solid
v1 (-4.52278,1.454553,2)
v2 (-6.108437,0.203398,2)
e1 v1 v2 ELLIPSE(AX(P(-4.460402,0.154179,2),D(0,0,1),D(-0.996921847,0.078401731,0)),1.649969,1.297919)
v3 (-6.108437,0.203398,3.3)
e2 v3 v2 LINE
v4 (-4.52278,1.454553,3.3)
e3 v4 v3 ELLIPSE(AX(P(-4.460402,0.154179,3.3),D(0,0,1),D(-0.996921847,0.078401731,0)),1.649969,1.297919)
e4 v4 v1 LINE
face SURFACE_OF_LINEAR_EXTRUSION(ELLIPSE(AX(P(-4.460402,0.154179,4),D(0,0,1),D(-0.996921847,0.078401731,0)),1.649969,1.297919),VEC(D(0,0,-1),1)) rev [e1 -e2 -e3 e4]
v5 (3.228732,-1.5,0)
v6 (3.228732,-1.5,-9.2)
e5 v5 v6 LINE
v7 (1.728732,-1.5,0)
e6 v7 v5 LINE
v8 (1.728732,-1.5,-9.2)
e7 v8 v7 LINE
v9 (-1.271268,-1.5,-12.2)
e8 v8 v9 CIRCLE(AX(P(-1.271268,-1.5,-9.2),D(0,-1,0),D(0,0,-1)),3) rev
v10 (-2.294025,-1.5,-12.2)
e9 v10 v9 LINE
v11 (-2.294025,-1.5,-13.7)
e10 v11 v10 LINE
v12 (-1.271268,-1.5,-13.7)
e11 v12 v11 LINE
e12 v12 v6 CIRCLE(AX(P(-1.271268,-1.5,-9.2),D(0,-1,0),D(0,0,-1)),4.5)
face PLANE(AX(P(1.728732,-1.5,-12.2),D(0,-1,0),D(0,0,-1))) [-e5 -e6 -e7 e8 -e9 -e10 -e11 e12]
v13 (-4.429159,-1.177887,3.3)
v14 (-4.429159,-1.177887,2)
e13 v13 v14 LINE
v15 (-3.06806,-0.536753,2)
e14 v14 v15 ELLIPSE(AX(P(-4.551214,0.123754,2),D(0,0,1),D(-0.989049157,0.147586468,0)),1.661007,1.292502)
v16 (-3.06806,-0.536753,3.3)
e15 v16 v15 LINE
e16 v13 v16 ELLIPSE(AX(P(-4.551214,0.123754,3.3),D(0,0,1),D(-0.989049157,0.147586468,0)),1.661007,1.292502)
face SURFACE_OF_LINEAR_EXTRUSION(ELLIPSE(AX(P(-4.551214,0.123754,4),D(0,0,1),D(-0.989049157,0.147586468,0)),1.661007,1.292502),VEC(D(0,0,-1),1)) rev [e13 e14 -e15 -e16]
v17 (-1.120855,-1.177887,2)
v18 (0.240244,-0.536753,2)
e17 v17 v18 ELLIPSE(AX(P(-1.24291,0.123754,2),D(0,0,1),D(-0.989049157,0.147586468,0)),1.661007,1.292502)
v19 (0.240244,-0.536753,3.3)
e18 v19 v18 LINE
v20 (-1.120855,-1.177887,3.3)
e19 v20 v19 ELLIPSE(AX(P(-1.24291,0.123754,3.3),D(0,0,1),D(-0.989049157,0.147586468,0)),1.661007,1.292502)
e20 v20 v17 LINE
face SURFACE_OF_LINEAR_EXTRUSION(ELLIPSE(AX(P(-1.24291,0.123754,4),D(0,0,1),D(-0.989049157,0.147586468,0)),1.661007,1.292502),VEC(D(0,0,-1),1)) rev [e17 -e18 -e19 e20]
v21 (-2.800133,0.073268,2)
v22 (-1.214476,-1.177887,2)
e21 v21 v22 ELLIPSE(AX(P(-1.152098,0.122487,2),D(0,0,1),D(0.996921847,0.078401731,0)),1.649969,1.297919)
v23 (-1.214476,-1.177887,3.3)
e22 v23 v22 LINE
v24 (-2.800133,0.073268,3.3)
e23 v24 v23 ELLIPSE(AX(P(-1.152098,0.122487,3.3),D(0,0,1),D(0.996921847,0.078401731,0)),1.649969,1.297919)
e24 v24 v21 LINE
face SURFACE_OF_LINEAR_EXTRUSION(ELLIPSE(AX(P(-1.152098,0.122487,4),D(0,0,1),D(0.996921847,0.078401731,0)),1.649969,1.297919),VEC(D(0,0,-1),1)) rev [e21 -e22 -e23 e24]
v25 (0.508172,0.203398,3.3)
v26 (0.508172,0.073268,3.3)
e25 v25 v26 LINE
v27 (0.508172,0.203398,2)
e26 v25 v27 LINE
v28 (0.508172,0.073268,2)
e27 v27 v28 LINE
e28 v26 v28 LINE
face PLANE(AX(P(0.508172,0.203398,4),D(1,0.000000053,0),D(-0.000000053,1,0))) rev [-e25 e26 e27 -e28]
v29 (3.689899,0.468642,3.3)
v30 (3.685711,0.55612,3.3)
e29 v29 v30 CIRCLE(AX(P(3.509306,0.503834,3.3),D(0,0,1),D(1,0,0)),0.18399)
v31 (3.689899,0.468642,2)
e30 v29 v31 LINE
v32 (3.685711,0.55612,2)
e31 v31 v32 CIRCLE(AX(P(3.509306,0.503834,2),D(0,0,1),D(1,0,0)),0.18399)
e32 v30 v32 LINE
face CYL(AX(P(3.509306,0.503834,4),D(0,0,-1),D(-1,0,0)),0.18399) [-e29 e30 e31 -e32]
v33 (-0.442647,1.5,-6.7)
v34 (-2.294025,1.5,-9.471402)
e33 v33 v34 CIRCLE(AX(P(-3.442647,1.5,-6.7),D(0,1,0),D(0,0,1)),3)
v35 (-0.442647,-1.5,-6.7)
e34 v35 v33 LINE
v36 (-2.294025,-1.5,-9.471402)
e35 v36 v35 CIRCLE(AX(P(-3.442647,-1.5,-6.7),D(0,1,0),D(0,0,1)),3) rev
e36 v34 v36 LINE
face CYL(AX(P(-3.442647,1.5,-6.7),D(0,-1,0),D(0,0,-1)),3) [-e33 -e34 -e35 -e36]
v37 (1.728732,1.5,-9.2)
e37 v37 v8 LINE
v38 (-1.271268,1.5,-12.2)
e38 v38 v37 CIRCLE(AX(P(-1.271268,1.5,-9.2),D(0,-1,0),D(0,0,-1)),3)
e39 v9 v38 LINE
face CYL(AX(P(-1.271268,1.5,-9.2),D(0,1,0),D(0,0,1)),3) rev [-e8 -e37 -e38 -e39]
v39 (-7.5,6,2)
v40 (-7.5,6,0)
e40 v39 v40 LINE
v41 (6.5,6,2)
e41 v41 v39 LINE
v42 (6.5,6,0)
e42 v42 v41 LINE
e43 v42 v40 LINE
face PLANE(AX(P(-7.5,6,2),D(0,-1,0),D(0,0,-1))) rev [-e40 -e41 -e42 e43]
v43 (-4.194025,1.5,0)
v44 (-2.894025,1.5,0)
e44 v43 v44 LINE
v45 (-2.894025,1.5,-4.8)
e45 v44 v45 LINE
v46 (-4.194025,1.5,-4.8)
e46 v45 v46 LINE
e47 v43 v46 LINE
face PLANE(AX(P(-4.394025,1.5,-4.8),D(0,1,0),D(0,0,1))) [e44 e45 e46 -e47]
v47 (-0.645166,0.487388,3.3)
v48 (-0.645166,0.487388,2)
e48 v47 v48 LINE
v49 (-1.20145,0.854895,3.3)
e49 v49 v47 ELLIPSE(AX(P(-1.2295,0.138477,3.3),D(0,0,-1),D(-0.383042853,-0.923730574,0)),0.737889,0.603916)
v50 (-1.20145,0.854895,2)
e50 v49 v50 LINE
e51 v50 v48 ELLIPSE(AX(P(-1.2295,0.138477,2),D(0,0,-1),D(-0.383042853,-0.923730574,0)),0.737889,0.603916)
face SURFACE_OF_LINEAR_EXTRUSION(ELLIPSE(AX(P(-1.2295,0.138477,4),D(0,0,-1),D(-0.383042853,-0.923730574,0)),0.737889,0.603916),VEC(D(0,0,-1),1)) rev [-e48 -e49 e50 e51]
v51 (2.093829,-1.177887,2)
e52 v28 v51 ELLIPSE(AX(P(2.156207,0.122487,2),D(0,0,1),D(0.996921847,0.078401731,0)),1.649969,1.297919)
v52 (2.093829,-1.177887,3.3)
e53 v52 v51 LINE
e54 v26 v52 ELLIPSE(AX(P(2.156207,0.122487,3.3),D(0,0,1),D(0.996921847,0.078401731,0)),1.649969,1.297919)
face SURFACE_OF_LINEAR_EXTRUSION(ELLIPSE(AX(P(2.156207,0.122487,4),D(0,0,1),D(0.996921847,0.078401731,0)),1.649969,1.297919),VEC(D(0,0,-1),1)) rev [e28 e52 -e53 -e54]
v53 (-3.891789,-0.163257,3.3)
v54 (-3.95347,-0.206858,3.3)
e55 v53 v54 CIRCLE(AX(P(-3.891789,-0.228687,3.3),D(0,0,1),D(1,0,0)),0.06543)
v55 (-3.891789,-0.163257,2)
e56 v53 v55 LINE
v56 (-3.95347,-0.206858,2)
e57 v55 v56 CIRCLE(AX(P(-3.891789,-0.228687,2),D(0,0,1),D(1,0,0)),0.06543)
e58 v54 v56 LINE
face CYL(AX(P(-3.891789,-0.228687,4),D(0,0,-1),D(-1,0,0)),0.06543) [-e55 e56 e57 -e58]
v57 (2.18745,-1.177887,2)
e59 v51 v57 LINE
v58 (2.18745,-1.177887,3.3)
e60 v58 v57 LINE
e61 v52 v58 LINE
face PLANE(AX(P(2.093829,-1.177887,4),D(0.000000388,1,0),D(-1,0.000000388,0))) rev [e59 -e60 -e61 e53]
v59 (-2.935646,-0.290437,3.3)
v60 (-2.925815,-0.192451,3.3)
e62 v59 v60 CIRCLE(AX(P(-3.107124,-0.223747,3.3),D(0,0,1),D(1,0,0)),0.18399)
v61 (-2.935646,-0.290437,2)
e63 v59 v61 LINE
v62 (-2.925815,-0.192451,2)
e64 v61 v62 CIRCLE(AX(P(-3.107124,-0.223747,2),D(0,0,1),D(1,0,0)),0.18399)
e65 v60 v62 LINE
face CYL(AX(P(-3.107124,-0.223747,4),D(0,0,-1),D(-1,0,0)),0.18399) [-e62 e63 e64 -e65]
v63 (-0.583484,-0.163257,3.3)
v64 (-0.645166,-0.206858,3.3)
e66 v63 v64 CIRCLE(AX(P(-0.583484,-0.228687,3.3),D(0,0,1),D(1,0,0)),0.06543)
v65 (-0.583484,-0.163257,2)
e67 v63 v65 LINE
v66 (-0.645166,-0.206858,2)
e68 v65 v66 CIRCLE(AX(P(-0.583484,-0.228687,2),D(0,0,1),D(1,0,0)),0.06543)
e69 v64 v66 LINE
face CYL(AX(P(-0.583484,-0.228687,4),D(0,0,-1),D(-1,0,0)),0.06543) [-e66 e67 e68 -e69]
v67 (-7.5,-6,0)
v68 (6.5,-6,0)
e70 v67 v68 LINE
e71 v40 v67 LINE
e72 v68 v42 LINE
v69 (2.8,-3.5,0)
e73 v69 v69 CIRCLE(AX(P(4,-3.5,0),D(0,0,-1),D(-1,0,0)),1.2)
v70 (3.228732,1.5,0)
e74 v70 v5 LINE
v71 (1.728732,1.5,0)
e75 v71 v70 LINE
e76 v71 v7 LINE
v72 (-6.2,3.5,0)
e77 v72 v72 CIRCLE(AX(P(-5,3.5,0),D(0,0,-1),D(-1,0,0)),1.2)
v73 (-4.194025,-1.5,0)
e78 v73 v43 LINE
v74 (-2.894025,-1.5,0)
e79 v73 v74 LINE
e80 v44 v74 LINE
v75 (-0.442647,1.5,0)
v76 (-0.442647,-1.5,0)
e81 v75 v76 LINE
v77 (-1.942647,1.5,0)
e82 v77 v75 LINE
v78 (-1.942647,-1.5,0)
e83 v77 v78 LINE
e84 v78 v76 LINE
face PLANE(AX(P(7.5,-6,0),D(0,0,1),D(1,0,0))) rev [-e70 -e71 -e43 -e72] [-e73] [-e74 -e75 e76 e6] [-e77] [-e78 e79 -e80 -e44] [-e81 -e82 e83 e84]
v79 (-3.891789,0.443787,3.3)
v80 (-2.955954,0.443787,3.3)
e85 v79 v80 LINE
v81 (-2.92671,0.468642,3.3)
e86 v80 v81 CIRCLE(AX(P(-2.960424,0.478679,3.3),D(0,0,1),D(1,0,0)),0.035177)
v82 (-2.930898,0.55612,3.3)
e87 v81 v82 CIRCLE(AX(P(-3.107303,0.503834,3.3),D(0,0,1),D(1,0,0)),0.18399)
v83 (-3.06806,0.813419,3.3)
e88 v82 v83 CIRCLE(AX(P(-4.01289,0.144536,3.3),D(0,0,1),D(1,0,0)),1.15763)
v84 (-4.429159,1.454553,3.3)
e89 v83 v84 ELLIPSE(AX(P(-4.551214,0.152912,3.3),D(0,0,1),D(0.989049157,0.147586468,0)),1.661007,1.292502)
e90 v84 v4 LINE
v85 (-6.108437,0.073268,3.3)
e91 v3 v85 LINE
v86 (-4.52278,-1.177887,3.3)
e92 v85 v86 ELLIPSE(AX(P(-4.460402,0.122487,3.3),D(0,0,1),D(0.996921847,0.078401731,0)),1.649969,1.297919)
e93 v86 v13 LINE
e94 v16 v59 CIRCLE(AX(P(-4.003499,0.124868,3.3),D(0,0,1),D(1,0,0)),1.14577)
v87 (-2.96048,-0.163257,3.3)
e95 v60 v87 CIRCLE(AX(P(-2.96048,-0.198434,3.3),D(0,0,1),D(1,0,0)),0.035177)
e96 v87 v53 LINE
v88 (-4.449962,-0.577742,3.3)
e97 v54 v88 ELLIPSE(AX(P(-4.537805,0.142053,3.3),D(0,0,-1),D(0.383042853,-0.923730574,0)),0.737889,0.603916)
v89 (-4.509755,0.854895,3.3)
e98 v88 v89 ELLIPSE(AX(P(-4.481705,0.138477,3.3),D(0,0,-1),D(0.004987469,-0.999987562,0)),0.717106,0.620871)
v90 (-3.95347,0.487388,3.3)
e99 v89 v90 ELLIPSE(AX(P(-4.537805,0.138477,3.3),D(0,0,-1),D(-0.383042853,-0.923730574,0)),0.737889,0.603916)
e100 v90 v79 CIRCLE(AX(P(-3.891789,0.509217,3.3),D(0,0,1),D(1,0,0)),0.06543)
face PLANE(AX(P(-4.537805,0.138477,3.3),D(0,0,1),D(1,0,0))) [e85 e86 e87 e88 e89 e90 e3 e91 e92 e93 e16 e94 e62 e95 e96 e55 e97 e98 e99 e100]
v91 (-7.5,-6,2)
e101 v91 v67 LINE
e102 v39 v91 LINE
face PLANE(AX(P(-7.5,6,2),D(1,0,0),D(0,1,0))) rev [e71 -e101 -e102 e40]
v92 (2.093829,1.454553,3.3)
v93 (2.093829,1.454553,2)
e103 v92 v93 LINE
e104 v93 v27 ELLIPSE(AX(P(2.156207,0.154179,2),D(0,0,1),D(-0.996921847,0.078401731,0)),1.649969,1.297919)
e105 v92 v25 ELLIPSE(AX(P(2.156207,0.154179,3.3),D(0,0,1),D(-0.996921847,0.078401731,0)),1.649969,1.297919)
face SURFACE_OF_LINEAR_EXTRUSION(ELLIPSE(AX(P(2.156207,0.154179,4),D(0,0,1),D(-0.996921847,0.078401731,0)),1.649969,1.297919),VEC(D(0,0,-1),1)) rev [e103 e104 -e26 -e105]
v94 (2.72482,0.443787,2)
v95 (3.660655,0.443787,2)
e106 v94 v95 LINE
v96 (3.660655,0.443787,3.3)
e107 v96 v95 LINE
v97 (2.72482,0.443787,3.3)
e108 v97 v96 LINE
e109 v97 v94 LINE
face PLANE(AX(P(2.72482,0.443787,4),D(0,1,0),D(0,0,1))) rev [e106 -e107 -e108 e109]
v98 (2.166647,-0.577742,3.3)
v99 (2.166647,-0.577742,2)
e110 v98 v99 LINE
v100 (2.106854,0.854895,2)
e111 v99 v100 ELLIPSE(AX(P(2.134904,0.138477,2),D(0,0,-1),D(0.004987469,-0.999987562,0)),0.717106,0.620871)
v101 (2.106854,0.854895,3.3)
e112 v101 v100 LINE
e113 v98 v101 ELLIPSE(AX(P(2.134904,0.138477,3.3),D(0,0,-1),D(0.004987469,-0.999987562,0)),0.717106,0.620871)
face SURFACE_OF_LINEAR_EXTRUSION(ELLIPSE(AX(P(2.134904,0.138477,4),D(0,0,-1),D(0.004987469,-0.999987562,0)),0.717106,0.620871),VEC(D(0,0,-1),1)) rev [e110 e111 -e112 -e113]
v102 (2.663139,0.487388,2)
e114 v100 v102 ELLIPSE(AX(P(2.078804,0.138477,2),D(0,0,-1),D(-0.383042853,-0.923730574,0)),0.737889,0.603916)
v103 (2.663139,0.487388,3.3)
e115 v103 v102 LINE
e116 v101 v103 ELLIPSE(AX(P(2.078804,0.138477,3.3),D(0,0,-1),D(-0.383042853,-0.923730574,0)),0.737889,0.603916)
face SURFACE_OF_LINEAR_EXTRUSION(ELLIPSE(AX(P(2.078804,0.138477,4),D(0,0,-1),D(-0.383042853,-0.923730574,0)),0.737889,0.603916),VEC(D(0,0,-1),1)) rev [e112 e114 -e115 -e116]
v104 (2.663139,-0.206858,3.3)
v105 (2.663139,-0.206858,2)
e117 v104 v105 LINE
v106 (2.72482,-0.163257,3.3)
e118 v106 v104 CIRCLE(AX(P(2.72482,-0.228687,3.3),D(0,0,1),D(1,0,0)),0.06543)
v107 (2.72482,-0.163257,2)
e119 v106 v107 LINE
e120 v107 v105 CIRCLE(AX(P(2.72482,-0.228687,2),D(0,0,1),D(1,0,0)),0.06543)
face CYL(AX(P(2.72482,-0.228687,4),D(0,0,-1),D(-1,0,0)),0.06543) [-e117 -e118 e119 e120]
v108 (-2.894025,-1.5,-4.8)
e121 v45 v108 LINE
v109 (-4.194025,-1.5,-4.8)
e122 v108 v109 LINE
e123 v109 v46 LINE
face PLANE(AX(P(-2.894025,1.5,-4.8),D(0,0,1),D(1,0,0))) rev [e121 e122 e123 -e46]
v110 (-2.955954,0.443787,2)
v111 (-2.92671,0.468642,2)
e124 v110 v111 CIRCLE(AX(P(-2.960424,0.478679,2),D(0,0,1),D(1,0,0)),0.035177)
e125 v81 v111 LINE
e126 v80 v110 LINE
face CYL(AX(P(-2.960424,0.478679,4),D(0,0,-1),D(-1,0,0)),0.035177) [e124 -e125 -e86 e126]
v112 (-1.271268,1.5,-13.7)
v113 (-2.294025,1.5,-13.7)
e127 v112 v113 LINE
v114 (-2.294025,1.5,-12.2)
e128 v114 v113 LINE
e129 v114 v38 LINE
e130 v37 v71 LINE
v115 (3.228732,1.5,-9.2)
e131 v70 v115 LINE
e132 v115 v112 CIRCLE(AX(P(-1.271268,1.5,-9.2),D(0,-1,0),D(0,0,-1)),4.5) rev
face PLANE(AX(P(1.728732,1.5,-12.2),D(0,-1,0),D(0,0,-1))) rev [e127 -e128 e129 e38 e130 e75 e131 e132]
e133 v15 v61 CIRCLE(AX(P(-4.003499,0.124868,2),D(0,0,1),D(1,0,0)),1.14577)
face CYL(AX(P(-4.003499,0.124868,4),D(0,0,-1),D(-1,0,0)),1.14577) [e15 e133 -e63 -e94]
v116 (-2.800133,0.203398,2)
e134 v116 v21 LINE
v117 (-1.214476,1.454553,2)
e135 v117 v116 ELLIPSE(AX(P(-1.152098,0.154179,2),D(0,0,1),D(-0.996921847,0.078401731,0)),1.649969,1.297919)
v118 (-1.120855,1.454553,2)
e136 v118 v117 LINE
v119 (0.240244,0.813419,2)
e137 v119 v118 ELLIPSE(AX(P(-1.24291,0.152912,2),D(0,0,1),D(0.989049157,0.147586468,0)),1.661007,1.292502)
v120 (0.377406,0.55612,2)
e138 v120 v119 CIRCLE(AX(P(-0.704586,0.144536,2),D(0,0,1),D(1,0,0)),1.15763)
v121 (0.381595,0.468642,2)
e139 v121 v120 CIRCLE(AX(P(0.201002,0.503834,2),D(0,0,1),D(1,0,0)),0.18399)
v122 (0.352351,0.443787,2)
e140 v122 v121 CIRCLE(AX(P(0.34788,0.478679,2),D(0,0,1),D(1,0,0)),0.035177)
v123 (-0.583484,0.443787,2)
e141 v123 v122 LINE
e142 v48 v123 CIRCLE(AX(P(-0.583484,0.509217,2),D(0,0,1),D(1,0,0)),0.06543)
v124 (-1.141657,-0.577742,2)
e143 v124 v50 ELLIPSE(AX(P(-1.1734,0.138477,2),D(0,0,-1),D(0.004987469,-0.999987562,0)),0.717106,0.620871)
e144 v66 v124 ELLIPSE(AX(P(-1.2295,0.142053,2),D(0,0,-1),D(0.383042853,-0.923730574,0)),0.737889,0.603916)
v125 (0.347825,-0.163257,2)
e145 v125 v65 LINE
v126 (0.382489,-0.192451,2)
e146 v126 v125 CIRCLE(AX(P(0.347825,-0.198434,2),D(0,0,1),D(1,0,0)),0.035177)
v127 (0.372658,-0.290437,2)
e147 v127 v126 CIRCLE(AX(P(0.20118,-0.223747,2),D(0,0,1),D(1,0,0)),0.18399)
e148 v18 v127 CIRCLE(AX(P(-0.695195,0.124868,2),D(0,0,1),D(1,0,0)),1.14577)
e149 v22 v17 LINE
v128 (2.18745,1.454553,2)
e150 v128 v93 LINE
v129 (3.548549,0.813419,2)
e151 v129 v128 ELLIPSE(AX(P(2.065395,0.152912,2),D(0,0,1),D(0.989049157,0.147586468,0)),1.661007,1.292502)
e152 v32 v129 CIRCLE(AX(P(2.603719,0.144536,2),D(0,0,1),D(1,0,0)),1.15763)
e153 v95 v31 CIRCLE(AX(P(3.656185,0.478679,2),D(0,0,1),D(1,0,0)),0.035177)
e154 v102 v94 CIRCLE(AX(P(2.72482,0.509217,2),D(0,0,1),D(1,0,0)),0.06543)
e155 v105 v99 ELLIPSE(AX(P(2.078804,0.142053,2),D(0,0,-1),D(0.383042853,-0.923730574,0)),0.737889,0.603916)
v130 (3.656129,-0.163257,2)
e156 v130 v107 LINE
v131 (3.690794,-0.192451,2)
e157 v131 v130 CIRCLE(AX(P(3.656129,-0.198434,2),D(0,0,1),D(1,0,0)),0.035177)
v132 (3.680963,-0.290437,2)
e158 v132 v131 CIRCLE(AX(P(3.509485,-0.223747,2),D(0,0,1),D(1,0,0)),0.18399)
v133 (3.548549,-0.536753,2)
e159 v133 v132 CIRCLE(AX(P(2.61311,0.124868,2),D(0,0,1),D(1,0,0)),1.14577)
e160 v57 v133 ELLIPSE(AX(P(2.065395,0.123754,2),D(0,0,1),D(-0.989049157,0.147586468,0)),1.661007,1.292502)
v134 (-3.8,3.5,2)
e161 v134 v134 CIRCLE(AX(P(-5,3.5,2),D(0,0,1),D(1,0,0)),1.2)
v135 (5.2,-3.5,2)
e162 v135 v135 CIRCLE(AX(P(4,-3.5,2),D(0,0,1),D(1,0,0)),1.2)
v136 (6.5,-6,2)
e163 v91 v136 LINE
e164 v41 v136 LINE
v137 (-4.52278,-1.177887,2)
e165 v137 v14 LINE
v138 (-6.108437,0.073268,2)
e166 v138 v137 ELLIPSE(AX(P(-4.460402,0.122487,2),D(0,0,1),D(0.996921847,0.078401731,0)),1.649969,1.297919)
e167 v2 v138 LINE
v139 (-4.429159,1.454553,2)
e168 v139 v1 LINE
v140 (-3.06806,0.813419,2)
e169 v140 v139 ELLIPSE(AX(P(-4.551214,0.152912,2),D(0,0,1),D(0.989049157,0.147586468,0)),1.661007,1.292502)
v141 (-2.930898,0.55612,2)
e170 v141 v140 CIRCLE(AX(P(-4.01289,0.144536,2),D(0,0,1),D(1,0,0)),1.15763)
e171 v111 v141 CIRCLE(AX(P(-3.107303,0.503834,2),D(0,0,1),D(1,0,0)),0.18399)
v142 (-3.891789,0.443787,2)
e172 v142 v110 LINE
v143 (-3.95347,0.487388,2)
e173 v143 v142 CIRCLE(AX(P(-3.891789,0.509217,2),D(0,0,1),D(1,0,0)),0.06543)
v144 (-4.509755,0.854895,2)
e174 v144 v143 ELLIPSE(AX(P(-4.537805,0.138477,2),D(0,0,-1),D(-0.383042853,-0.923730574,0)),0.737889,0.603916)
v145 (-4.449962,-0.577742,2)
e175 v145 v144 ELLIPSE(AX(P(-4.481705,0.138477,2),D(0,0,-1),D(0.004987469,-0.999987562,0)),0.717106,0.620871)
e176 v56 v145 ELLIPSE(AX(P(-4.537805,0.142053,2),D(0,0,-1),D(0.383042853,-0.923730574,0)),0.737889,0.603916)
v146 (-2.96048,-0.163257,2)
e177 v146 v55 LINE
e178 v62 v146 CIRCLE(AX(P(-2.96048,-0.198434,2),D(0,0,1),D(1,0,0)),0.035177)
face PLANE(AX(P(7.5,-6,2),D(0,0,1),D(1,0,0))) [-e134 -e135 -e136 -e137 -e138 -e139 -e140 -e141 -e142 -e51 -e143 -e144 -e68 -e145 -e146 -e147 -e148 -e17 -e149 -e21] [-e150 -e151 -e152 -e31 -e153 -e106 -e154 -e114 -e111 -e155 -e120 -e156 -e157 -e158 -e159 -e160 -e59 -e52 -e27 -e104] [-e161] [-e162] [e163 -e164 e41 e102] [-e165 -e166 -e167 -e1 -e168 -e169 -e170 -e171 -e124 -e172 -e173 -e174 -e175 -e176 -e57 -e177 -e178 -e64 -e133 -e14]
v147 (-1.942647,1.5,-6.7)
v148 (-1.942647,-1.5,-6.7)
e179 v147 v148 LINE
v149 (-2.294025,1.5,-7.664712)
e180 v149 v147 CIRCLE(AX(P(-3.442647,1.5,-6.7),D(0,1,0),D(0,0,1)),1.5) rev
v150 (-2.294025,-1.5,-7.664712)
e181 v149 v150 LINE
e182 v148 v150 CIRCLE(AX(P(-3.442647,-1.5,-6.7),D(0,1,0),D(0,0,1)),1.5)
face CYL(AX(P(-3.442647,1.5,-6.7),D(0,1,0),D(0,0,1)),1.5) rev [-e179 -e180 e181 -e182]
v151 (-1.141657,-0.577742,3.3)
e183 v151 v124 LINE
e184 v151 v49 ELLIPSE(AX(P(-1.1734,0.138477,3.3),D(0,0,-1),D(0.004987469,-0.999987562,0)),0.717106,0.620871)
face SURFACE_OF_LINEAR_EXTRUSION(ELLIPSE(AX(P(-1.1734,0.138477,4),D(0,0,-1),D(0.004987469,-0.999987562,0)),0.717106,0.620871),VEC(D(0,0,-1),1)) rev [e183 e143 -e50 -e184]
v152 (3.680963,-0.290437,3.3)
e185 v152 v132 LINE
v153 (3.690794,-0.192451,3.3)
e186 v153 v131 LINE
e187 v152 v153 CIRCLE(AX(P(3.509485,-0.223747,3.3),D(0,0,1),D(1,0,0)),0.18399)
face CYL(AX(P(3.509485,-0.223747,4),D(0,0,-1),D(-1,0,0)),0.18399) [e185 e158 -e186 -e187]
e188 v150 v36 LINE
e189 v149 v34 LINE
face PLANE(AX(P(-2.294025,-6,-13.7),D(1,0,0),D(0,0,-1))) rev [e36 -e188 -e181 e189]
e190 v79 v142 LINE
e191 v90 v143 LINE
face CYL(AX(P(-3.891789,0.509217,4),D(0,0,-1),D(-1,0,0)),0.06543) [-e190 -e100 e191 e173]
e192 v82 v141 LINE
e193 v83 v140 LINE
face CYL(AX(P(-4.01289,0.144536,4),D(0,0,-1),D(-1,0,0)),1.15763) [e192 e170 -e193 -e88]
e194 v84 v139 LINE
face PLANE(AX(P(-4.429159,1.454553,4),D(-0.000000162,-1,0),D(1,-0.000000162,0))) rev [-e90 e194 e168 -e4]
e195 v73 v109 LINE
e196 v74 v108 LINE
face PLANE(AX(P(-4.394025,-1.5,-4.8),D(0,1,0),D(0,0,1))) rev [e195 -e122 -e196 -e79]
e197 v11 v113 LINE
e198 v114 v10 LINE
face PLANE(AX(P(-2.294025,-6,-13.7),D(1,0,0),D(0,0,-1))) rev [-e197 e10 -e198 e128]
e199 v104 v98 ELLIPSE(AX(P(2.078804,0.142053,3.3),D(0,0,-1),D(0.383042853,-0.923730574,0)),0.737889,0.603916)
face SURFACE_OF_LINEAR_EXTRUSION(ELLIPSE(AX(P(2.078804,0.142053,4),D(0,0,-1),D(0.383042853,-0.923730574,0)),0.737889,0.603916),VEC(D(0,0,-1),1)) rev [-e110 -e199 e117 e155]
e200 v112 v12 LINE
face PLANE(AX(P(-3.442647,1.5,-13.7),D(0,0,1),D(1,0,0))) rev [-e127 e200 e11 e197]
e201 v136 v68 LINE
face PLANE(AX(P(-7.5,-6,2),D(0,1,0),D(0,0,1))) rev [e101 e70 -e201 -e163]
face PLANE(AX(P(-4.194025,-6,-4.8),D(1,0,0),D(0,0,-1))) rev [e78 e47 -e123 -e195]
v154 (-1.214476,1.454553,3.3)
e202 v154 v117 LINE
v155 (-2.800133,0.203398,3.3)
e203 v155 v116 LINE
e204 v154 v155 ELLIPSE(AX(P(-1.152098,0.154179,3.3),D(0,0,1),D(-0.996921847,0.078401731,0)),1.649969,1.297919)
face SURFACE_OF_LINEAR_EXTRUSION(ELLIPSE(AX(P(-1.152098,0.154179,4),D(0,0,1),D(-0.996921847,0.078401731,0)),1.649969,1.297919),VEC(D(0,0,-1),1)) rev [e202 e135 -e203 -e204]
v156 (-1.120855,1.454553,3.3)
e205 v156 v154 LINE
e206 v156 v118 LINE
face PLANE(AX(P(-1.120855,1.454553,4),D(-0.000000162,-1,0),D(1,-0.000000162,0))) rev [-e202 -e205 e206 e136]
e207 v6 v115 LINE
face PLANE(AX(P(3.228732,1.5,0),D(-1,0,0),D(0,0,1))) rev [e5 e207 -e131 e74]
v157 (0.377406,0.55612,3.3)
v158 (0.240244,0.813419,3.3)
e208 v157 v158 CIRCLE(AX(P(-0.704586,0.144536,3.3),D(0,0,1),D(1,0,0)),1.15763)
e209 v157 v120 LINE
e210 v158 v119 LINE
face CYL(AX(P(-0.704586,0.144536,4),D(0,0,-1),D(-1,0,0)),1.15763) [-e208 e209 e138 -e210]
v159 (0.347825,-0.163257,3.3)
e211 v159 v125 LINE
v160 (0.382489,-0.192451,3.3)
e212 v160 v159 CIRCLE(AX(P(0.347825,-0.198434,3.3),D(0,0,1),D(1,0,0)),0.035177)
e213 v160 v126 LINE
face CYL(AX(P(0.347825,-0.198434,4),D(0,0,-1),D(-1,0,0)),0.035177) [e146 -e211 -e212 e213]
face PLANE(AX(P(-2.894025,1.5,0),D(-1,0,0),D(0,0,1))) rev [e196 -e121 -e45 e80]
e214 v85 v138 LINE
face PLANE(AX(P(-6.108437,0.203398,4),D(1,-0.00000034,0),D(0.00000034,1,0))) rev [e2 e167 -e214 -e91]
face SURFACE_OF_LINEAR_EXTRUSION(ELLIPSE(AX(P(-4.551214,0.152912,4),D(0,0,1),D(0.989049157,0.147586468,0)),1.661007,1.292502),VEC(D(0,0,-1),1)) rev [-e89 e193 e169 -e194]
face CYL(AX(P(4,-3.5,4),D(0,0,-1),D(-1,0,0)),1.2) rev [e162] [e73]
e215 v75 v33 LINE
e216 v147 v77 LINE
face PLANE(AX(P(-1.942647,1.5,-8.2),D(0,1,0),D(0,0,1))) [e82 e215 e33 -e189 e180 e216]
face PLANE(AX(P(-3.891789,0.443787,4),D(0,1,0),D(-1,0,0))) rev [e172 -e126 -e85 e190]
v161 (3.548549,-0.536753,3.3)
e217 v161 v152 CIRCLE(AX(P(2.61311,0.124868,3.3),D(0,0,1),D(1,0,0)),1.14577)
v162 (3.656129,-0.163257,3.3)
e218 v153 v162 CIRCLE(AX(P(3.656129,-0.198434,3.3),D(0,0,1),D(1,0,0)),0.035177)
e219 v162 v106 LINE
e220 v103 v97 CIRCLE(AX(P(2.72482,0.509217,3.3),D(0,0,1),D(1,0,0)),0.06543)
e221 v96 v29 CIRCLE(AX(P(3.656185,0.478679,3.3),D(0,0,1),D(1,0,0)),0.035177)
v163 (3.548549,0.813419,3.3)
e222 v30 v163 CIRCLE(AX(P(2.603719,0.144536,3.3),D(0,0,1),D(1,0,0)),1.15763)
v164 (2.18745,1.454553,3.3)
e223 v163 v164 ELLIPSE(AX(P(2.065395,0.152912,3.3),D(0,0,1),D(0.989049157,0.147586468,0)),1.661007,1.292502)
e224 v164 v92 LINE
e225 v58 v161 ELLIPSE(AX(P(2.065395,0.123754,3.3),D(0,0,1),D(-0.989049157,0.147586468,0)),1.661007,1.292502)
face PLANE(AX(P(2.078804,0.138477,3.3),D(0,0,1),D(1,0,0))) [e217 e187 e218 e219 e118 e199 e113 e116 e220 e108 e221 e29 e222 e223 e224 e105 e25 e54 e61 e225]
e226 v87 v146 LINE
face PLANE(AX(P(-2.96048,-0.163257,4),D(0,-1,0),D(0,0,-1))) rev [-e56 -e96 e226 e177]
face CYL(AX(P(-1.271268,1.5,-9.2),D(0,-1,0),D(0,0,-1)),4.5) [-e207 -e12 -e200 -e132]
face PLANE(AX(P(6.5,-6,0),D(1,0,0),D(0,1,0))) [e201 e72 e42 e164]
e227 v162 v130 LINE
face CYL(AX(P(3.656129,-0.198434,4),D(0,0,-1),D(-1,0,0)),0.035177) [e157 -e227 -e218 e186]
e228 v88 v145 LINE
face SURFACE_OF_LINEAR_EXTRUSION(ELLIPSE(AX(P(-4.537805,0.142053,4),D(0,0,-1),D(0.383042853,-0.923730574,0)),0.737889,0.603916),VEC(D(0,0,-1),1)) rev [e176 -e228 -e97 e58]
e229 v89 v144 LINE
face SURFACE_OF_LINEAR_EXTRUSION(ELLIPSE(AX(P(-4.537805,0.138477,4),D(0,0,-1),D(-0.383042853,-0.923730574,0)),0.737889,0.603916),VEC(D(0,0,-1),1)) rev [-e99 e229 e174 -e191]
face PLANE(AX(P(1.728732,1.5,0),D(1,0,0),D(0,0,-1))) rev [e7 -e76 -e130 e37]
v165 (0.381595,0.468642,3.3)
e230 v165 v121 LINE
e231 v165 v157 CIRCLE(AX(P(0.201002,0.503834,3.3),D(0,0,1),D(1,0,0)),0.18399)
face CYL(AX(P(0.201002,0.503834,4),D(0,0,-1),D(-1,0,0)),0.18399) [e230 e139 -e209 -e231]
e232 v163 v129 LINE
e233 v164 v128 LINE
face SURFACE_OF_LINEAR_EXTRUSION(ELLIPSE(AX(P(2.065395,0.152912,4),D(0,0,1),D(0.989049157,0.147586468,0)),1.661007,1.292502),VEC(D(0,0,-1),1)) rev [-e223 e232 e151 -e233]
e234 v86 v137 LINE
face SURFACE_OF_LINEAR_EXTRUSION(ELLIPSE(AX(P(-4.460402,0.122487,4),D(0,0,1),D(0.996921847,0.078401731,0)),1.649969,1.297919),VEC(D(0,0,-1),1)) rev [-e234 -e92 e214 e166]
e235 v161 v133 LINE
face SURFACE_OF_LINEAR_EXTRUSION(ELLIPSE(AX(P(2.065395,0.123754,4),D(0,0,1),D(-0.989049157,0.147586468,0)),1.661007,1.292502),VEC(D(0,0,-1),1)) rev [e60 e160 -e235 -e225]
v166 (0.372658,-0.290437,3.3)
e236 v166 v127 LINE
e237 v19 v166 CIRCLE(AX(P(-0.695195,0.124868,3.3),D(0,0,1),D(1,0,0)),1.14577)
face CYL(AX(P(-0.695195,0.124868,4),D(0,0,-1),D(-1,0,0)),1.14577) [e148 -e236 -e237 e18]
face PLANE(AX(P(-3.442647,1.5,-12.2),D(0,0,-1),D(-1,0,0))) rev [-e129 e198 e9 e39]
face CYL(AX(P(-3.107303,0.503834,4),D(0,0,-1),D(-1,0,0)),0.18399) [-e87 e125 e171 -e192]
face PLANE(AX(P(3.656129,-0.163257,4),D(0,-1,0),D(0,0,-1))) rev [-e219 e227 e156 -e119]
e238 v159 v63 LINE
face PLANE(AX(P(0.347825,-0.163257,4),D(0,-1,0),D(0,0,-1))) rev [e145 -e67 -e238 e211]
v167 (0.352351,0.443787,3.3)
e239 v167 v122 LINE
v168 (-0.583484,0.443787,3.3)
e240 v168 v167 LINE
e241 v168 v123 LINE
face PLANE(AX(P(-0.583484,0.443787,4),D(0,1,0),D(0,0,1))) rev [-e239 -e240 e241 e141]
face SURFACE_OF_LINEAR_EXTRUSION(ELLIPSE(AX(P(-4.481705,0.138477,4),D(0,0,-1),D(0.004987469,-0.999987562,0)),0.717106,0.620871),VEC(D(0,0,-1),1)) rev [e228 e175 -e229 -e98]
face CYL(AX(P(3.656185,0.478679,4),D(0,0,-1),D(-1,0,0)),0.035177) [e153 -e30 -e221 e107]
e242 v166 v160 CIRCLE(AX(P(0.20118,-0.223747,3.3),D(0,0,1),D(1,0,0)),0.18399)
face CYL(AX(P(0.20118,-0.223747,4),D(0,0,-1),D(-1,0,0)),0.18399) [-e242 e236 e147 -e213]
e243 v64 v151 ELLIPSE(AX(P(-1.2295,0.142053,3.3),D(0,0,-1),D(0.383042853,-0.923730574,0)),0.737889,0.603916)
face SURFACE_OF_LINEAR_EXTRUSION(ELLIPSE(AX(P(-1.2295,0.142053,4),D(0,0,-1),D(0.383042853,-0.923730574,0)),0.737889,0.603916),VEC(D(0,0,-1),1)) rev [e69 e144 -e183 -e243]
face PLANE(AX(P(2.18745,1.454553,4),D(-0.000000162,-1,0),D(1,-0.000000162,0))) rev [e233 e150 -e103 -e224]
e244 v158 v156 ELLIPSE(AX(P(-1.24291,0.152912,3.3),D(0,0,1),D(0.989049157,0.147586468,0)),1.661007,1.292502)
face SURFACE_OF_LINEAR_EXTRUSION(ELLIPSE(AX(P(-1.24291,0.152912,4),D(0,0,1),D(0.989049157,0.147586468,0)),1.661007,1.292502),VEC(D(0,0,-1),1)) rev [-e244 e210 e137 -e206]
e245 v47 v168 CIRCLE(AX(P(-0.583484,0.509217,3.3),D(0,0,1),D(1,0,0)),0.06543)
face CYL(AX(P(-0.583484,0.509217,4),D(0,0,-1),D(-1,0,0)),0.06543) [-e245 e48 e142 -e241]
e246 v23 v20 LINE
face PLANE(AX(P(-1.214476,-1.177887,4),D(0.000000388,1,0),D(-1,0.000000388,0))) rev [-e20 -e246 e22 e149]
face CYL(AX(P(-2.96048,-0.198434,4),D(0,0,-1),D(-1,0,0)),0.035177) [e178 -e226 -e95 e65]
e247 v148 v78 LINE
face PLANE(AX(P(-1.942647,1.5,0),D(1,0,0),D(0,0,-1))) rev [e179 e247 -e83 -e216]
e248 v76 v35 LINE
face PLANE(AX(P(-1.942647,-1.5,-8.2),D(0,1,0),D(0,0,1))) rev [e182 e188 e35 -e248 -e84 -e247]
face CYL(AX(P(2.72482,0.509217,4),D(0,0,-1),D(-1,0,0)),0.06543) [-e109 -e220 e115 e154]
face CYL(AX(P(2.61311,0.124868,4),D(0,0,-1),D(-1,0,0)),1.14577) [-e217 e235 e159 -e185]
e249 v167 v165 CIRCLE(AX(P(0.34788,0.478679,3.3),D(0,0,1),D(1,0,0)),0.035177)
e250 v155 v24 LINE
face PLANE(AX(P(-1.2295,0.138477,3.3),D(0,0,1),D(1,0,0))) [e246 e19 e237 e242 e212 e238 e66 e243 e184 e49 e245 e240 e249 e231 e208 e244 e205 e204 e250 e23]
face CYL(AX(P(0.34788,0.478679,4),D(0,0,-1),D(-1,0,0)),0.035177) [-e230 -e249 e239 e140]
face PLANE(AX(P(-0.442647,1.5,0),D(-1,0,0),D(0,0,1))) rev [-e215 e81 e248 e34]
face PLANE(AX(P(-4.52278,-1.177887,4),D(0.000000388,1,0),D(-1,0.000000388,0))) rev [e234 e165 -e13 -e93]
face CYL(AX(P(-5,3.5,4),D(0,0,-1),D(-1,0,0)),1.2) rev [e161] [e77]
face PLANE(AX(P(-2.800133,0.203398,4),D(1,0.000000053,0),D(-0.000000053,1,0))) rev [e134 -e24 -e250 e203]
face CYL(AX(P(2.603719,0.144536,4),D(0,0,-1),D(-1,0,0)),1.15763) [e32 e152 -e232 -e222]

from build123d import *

# Parameters (mm, degrees)
SKETCH1_W           = 15
SKETCH1_H           = 12
BOSS_EXTRUDE1_DEPTH = 2
BOSS_EXTRUDE2_DEPTH = 2
SKETCH3_W           = 1.5
SKETCH3_H           = 4.8
BOSS_EXTRUDE3_DEPTH = 1.5
FILLET3_R           = 1.5
FILLET4_R           = 3
FILLET5_R           = 3
FILLET6_R           = 4.5
SKETCH4_W           = 2
SKETCH4_H           = 12
CUT_EXTRUDE1_DEPTH  = 1
SKETCH5_R           = 1.2
CUT_EXTRUDE2_DEPTH  = 17.731407672
CUT_EXTRUDE3_START  = -0.7
CUT_EXTRUDE3_DEPTH  = 0.7
SKETCH7_W           = 1.148621372
SKETCH7_H           = 6.2
CUT_EXTRUDE4_DEPTH  = 18.325992122
SKETCH8_W           = 0.2
SKETCH8_H           = 4.8
CUT_EXTRUDE5_DEPTH  = 18.325992122


with BuildPart() as part:
    # Sketch1 → Boss-Extrude1 (new body)
    with BuildSketch(Plane.XY):
        Rectangle(SKETCH1_W, SKETCH1_H)
    extrude(amount=BOSS_EXTRUDE1_DEPTH)

    # Sketch2 → Boss-Extrude2 (add)
    with BuildSketch(Plane.XY.offset(2)):
        with BuildLine():
            Line((-0.583484164, 0.443787032), (0.352350759, 0.443787032))
            ThreePointArc((0.352350759, 0.443787032), (0.370660979, 0.451874829), (0.381594807, 0.468641703))
            ThreePointArc((0.381594807, 0.468641703), (0.38478126, 0.512633483), (0.377406248, 0.556119567))
            ThreePointArc((0.377406248, 0.556119567), (0.316958398, 0.689104808), (0.240244136, 0.81341868))
            add(Edge.make_bspline(
                [(0.240244136, 0.81341868), (-0.178053426, 1.454553053), (-1.120854898, 1.454553053)],
                knots=[3.484341046, 3.484341046, 3.484341046, 4.522924348, 4.522924348, 4.522924348], degree=2, weights=[1, 0.868170926, 1]))
            Line((-1.120854898, 1.454553053), (-1.214475951, 1.454553068))
            add(Edge.make_bspline(
                [(-1.214475951, 1.454553068), (-2.800132813, 1.454553068), (-2.800132813, 0.203397992)],
                knots=[1.670440536, 1.670440536, 1.670440536, 3.203377674, 3.203377674, 3.203377674], degree=2, weights=[1, 0.720364542, 1]))
            Line((-2.800132813, 0.203397992), (-2.800132806, 0.073267738))
            add(Edge.make_bspline(
                [(-2.800132806, 0.073267738), (-2.800132806, -1.177887338), (-1.214475944, -1.177887338)],
                knots=[3.079807634, 3.079807634, 3.079807634, 4.612744771, 4.612744771, 4.612744771], degree=2, weights=[1, 0.720364542, 1]))
            Line((-1.214475944, -1.177887338), (-1.120854891, -1.177887375))
            add(Edge.make_bspline(
                [(-1.120854891, -1.177887375), (-0.178053419, -1.177887375), (0.240244143, -0.536753002)],
                knots=[1.760260959, 1.760260959, 1.760260959, 2.798844261, 2.798844261, 2.798844261], degree=2, weights=[1, 0.868170926, 1]))
            ThreePointArc((0.240244143, -0.536753002), (0.313994237, -0.417650167), (0.372658208, -0.290437354))
            ThreePointArc((0.372658208, -0.290437354), (0.384251196, -0.24211404), (0.382489087, -0.192450825))
            ThreePointArc((0.382489087, -0.192450825), (0.370484527, -0.171527836), (0.347824512, -0.163257123))
            Line((0.347824512, -0.163257123), (-0.58348421, -0.163257123))
            ThreePointArc((-0.58348421, -0.163257123), (-0.62125204, -0.175257922), (-0.645165579, -0.206858093))
            add(Edge.make_bspline(
                [(-1.141657158, -0.577741646), (-0.776549247, -0.578100851), (-0.645165579, -0.206858093)],
                knots=[5.955155363, 5.955155363, 5.955155363, 7.020735545, 7.020735545, 7.020735545], degree=2, weights=[1, 0.86139323, 1]))
            add(Edge.make_bspline(
                [(-1.201450314, 0.854894524), (-1.823540048, 0.823436889), (-1.793554178, 0.104979402), (-1.763568309, -0.613478086), (-1.141657158, -0.577741646)],
                knots=[0.039432941, 0.039432941, 0.039432941, 1.613207044, 1.613207044, 3.186981147, 3.186981147, 3.186981147], degree=2, weights=[1, 0.706053195, 1, 0.706053195, 1]))
            add(Edge.make_bspline(
                [(-0.645165584, 0.487388037), (-0.79140441, 0.900606071), (-1.201450314, 0.854894524)],
                knots=[2.404042441, 2.404042441, 2.404042441, 3.565685694, 3.565685694, 3.565685694], degree=2, weights=[1, 0.836012096, 1]))
            ThreePointArc((-0.645165584, 0.487388037), (-0.621252025, 0.455787841), (-0.583484164, 0.443787032))
        make_face()
        with BuildLine():
            Line((-3.89178871, 0.443787032), (-2.955953786, 0.443787032))
            ThreePointArc((-2.955953786, 0.443787032), (-2.937643536, 0.451874816), (-2.926709688, 0.468641703))
            ThreePointArc((-2.926709688, 0.468641703), (-2.923523234, 0.512633483), (-2.930898247, 0.556119567))
            ThreePointArc((-2.930898247, 0.556119567), (-2.991346096, 0.689104808), (-3.068060358, 0.81341868))
            add(Edge.make_bspline(
                [(-3.068060358, 0.81341868), (-3.48635792, 1.454553053), (-4.429159392, 1.454553053)],
                knots=[3.484341046, 3.484341046, 3.484341046, 4.522924348, 4.522924348, 4.522924348], degree=2, weights=[1, 0.868170926, 1]))
            Line((-4.429159392, 1.454553053), (-4.522780446, 1.454553068))
            add(Edge.make_bspline(
                [(-4.522780446, 1.454553068), (-6.108437307, 1.454553068), (-6.108437307, 0.203397992)],
                knots=[4.81203319, 4.81203319, 4.81203319, 6.344970327, 6.344970327, 6.344970327], degree=2, weights=[1, 0.720364542, 1]))
            Line((-6.108437307, 0.203397992), (-6.108437352, 0.073267738))
            add(Edge.make_bspline(
                [(-6.108437352, 0.073267738), (-6.108437352, -1.177887338), (-4.52278049, -1.177887338)],
                knots=[6.221400287, 6.221400287, 6.221400287, 7.754337425, 7.754337425, 7.754337425], degree=2, weights=[1, 0.720364542, 1]))
            Line((-4.52278049, -1.177887338), (-4.429159437, -1.177887375))
            add(Edge.make_bspline(
                [(-4.429159437, -1.177887375), (-3.486357965, -1.177887375), (-3.068060402, -0.536753002)],
                knots=[1.760260959, 1.760260959, 1.760260959, 2.798844261, 2.798844261, 2.798844261], degree=2, weights=[1, 0.868170926, 1]))
            ThreePointArc((-3.068060402, -0.536753002), (-2.994310308, -0.417650167), (-2.935646337, -0.290437354))
            ThreePointArc((-2.935646337, -0.290437354), (-2.92405335, -0.24211404), (-2.925815458, -0.192450825))
            ThreePointArc((-2.925815458, -0.192450825), (-2.937820019, -0.171527836), (-2.960480033, -0.163257123))
            Line((-2.960480033, -0.163257123), (-3.891788755, -0.163257123))
            ThreePointArc((-3.891788755, -0.163257123), (-3.929556585, -0.175257922), (-3.953470124, -0.206858093))
            add(Edge.make_bspline(
                [(-4.449961703, -0.577741646), (-4.084853792, -0.578100851), (-3.953470124, -0.206858093)],
                knots=[5.955155363, 5.955155363, 5.955155363, 7.020735545, 7.020735545, 7.020735545], degree=2, weights=[1, 0.86139323, 1]))
            add(Edge.make_bspline(
                [(-4.509754859, 0.854894524), (-5.131844593, 0.82343689), (-5.101858724, 0.104979402), (-5.071872854, -0.613478086), (-4.449961703, -0.577741646)],
                knots=[0.039432941, 0.039432941, 0.039432941, 1.613207044, 1.613207044, 3.186981147, 3.186981147, 3.186981147], degree=2, weights=[1, 0.706053195, 1, 0.706053195, 1]))
            add(Edge.make_bspline(
                [(-3.95347013, 0.487388037), (-4.099708956, 0.900606071), (-4.509754859, 0.854894524)],
                knots=[2.40404244, 2.40404244, 2.40404244, 3.565685694, 3.565685694, 3.565685694], degree=2, weights=[1, 0.836012096, 1]))
            ThreePointArc((-3.95347013, 0.487388037), (-3.92955657, 0.455787841), (-3.89178871, 0.443787032))
        make_face()
        with BuildLine():
            Line((2.724820382, 0.443787032), (3.660655305, 0.443787032))
            ThreePointArc((3.660655305, 0.443787032), (3.678965525, 0.451874829), (3.689899353, 0.468641703))
            ThreePointArc((3.689899353, 0.468641703), (3.693085806, 0.512633483), (3.685710794, 0.556119567))
            ThreePointArc((3.685710794, 0.556119567), (3.625262944, 0.689104808), (3.548548682, 0.81341868))
            add(Edge.make_bspline(
                [(3.548548682, 0.81341868), (3.13025112, 1.454553053), (2.187449648, 1.454553053)],
                knots=[0.342748392, 0.342748392, 0.342748392, 1.381331695, 1.381331695, 1.381331695], degree=2, weights=[1, 0.868170926, 1]))
            Line((2.187449648, 1.454553053), (2.093828595, 1.454553068))
            add(Edge.make_bspline(
                [(2.093828595, 1.454553068), (0.508171733, 1.454553068), (0.508171733, 0.203397992)],
                knots=[4.81203319, 4.81203319, 4.81203319, 6.344970327, 6.344970327, 6.344970327], degree=2, weights=[1, 0.720364542, 1]))
            Line((0.508171733, 0.203397992), (0.50817174, 0.073267738))
            add(Edge.make_bspline(
                [(0.50817174, 0.073267738), (0.50817174, -1.177887338), (2.093828602, -1.177887338)],
                knots=[3.079807634, 3.079807634, 3.079807634, 4.612744771, 4.612744771, 4.612744771], degree=2, weights=[1, 0.720364542, 1]))
            Line((2.093828602, -1.177887338), (2.187449655, -1.177887375))
            add(Edge.make_bspline(
                [(2.187449655, -1.177887375), (3.130251127, -1.177887375), (3.548548689, -0.536753002)],
                knots=[1.760260959, 1.760260959, 1.760260959, 2.798844261, 2.798844261, 2.798844261], degree=2, weights=[1, 0.868170926, 1]))
            ThreePointArc((3.548548689, -0.536753002), (3.622298783, -0.417650167), (3.680962754, -0.290437354))
            ThreePointArc((3.680962754, -0.290437354), (3.692555742, -0.24211404), (3.690793633, -0.192450825))
            ThreePointArc((3.690793633, -0.192450825), (3.678789073, -0.171527836), (3.656129058, -0.163257123))
            Line((3.656129058, -0.163257123), (2.724820336, -0.163257123))
            ThreePointArc((2.724820336, -0.163257123), (2.687052506, -0.175257922), (2.663138967, -0.206858093))
            add(Edge.make_bspline(
                [(2.166647388, -0.577741646), (2.531755299, -0.578100851), (2.663138967, -0.206858093)],
                knots=[5.955155363, 5.955155363, 5.955155363, 7.020735545, 7.020735545, 7.020735545], degree=2, weights=[1, 0.86139323, 1]))
            add(Edge.make_bspline(
                [(2.106854232, 0.854894524), (1.484764498, 0.823436889), (1.514750368, 0.104979402), (1.544736237, -0.613478086), (2.166647388, -0.577741646)],
                knots=[3.181025595, 3.181025595, 3.181025595, 4.754799698, 4.754799698, 6.328573801, 6.328573801, 6.328573801], degree=2, weights=[1, 0.706053195, 1, 0.706053195, 1]))
            add(Edge.make_bspline(
                [(2.663138962, 0.487388037), (2.516900136, 0.900606071), (2.106854232, 0.854894524)],
                knots=[5.545635094, 5.545635094, 5.545635094, 6.707278348, 6.707278348, 6.707278348], degree=2, weights=[1, 0.836012096, 1]))
            ThreePointArc((2.663138962, 0.487388037), (2.687052521, 0.455787841), (2.724820382, 0.443787032))
        make_face()
    extrude(amount=BOSS_EXTRUDE2_DEPTH)

    # Sketch3 → Boss-Extrude3 (add, symmetric)
    with BuildSketch(Plane(origin=(0, 0, 0), x_dir=(1, 0, 0), z_dir=(0, 1, 0))):
        Polygon((1.72873188, 0), (3.22873188, 0), (3.22873188, 13.7), (-3.442646753, 13.7), (-3.442646753, 12.2), (1.72873188, 12.2), align=None)
        with Locations((-3.644025381, 2.4)):
            Rectangle(SKETCH3_W, SKETCH3_H)
        Polygon((-1.942646753, 0), (-0.442646753, 0), (-0.442646753, 9.7), (-3.442646753, 9.7), (-3.442646753, 8.2), (-1.942646753, 8.2), align=None)
    extrude(amount=BOSS_EXTRUDE3_DEPTH, both=True)

    # Fillet3
    fillet3_edges = [part.edges().sort_by_distance(p)[0] for p in [
        (-1.942646753, 0, -8.2),
    ]]
    fillet(fillet3_edges, radius=FILLET3_R - 0.0001)  # a hair under: the kernel refuses the full size

    # Fillet4
    fillet4_edges = [part.edges().sort_by_distance(p)[0] for p in [
        (-0.442646753, 0, -9.7),
    ]]
    fillet(fillet4_edges, radius=FILLET4_R - 0.0001)  # a hair under: the kernel refuses the full size

    # Fillet5
    fillet5_edges = [part.edges().sort_by_distance(p)[0] for p in [
        (1.72873188, 0, -12.2),
    ]]
    fillet(fillet5_edges, radius=FILLET5_R)

    # Fillet6
    fillet6_edges = [part.edges().sort_by_distance(p)[0] for p in [
        (3.22873188, 0, -13.7),
    ]]
    fillet(fillet6_edges, radius=FILLET6_R)

    # Sketch4 → Cut-Extrude1 (cut)
    with BuildSketch(Plane(origin=(7.5, 0, 0), x_dir=(0, 0, -1), z_dir=(1, 0, 0))):
        with Locations((-1, 0)):
            Rectangle(SKETCH4_W, SKETCH4_H)
    extrude(amount=-CUT_EXTRUDE1_DEPTH, mode=Mode.SUBTRACT)

    # Sketch5 → Cut-Extrude2 (cut, through all)
    with BuildSketch(Plane(origin=(0, 0, 0), x_dir=(-1, 0, 0), z_dir=(0, 0, -1))):
        with Locations((-4, -3.5)):
            Circle(SKETCH5_R)
        with Locations((5, 3.5)):
            Circle(SKETCH5_R)
    extrude(amount=-CUT_EXTRUDE2_DEPTH, mode=Mode.SUBTRACT)

    # Sketch6 → Cut-Extrude3 (cut)
    with BuildSketch(Plane.XY.offset(4).offset(CUT_EXTRUDE3_START)):
        with BuildLine():
            Line((2.724820382, 0.443787032), (3.660655305, 0.443787032))
            ThreePointArc((3.660655305, 0.443787032), (3.678965525, 0.451874829), (3.689899353, 0.468641703))
            ThreePointArc((3.689899353, 0.468641703), (3.693085806, 0.512633483), (3.685710794, 0.556119567))
            ThreePointArc((3.685710794, 0.556119567), (3.625262944, 0.689104808), (3.548548682, 0.81341868))
            add(Edge.make_bspline(
                [(3.548548682, 0.81341868), (3.13025112, 1.454553053), (2.187449648, 1.454553053)],
                knots=[0.342748392, 0.342748392, 0.342748392, 1.381331695, 1.381331695, 1.381331695], degree=2, weights=[1, 0.868170926, 1]))
            Line((2.187449648, 1.454553053), (2.093828595, 1.454553068))
            add(Edge.make_bspline(
                [(2.093828595, 1.454553068), (0.508171733, 1.454553068), (0.508171733, 0.203397992)],
                knots=[4.81203319, 4.81203319, 4.81203319, 6.344970327, 6.344970327, 6.344970327], degree=2, weights=[1, 0.720364542, 1]))
            Line((0.508171733, 0.203397992), (0.50817174, 0.073267738))
            add(Edge.make_bspline(
                [(0.50817174, 0.073267738), (0.50817174, -1.177887338), (2.093828602, -1.177887338)],
                knots=[3.079807634, 3.079807634, 3.079807634, 4.612744771, 4.612744771, 4.612744771], degree=2, weights=[1, 0.720364542, 1]))
            Line((2.093828602, -1.177887338), (2.187449655, -1.177887375))
            add(Edge.make_bspline(
                [(2.187449655, -1.177887375), (3.130251127, -1.177887375), (3.548548689, -0.536753002)],
                knots=[1.760260959, 1.760260959, 1.760260959, 2.798844261, 2.798844261, 2.798844261], degree=2, weights=[1, 0.868170926, 1]))
            ThreePointArc((3.548548689, -0.536753002), (3.622298783, -0.417650167), (3.680962754, -0.290437354))
            ThreePointArc((3.680962754, -0.290437354), (3.692555742, -0.24211404), (3.690793633, -0.192450825))
            ThreePointArc((3.690793633, -0.192450825), (3.678789073, -0.171527836), (3.656129058, -0.163257123))
            Line((3.656129058, -0.163257123), (2.724820336, -0.163257123))
            ThreePointArc((2.724820336, -0.163257123), (2.687052506, -0.175257922), (2.663138967, -0.206858093))
            add(Edge.make_bspline(
                [(2.166647388, -0.577741646), (2.531755299, -0.578100851), (2.663138967, -0.206858093)],
                knots=[5.955155363, 5.955155363, 5.955155363, 7.020735545, 7.020735545, 7.020735545], degree=2, weights=[1, 0.86139323, 1]))
            add(Edge.make_bspline(
                [(2.106854232, 0.854894524), (1.484764498, 0.823436889), (1.514750368, 0.104979402), (1.544736237, -0.613478086), (2.166647388, -0.577741646)],
                knots=[3.181025595, 3.181025595, 3.181025595, 4.754799698, 4.754799698, 6.328573801, 6.328573801, 6.328573801], degree=2, weights=[1, 0.706053195, 1, 0.706053195, 1]))
            add(Edge.make_bspline(
                [(2.663138962, 0.487388037), (2.516900136, 0.900606071), (2.106854232, 0.854894524)],
                knots=[2.404042441, 2.404042441, 2.404042441, 3.565685694, 3.565685694, 3.565685694], degree=2, weights=[1, 0.836012096, 1]))
            ThreePointArc((2.663138962, 0.487388037), (2.687052521, 0.455787841), (2.724820382, 0.443787032))
        make_face()
        with BuildLine():
            Line((-0.583484164, 0.443787032), (0.352350759, 0.443787032))
            ThreePointArc((0.352350759, 0.443787032), (0.370660979, 0.451874829), (0.381594807, 0.468641703))
            ThreePointArc((0.381594807, 0.468641703), (0.38478126, 0.512633483), (0.377406248, 0.556119567))
            ThreePointArc((0.377406248, 0.556119567), (0.316958398, 0.689104808), (0.240244136, 0.81341868))
            add(Edge.make_bspline(
                [(0.240244136, 0.81341868), (-0.178053426, 1.454553053), (-1.120854898, 1.454553053)],
                knots=[0.342748392, 0.342748392, 0.342748392, 1.381331695, 1.381331695, 1.381331695], degree=2, weights=[1, 0.868170926, 1]))
            Line((-1.120854898, 1.454553053), (-1.214475951, 1.454553068))
            add(Edge.make_bspline(
                [(-1.214475951, 1.454553068), (-2.800132813, 1.454553068), (-2.800132813, 0.203397992)],
                knots=[4.81203319, 4.81203319, 4.81203319, 6.344970327, 6.344970327, 6.344970327], degree=2, weights=[1, 0.720364542, 1]))
            Line((-2.800132813, 0.203397992), (-2.800132806, 0.073267738))
            add(Edge.make_bspline(
                [(-2.800132806, 0.073267738), (-2.800132806, -1.177887338), (-1.214475944, -1.177887338)],
                knots=[3.079807634, 3.079807634, 3.079807634, 4.612744771, 4.612744771, 4.612744771], degree=2, weights=[1, 0.720364542, 1]))
            Line((-1.214475944, -1.177887338), (-1.120854891, -1.177887375))
            add(Edge.make_bspline(
                [(-1.120854891, -1.177887375), (-0.178053419, -1.177887375), (0.240244143, -0.536753002)],
                knots=[1.760260959, 1.760260959, 1.760260959, 2.798844261, 2.798844261, 2.798844261], degree=2, weights=[1, 0.868170926, 1]))
            ThreePointArc((0.240244143, -0.536753002), (0.313994237, -0.417650167), (0.372658208, -0.290437354))
            ThreePointArc((0.372658208, -0.290437354), (0.384251196, -0.24211404), (0.382489087, -0.192450825))
            ThreePointArc((0.382489087, -0.192450825), (0.370484527, -0.171527836), (0.347824512, -0.163257123))
            Line((0.347824512, -0.163257123), (-0.58348421, -0.163257123))
            ThreePointArc((-0.58348421, -0.163257123), (-0.62125204, -0.175257922), (-0.645165579, -0.206858093))
            add(Edge.make_bspline(
                [(-1.141657158, -0.577741646), (-0.776549247, -0.578100851), (-0.645165579, -0.206858093)],
                knots=[5.955155363, 5.955155363, 5.955155363, 7.020735545, 7.020735545, 7.020735545], degree=2, weights=[1, 0.86139323, 1]))
            add(Edge.make_bspline(
                [(-1.201450314, 0.854894524), (-1.823540048, 0.823436889), (-1.793554178, 0.104979402), (-1.763568309, -0.613478086), (-1.141657158, -0.577741646)],
                knots=[3.181025595, 3.181025595, 3.181025595, 4.754799698, 4.754799698, 6.328573801, 6.328573801, 6.328573801], degree=2, weights=[1, 0.706053195, 1, 0.706053195, 1]))
            add(Edge.make_bspline(
                [(-0.645165584, 0.487388037), (-0.79140441, 0.900606071), (-1.201450314, 0.854894524)],
                knots=[2.404042441, 2.404042441, 2.404042441, 3.565685694, 3.565685694, 3.565685694], degree=2, weights=[1, 0.836012096, 1]))
            ThreePointArc((-0.645165584, 0.487388037), (-0.621252025, 0.455787841), (-0.583484164, 0.443787032))
        make_face()
        with BuildLine():
            Line((-3.89178871, 0.443787032), (-2.955953786, 0.443787032))
            ThreePointArc((-2.955953786, 0.443787032), (-2.937643536, 0.451874816), (-2.926709688, 0.468641703))
            ThreePointArc((-2.926709688, 0.468641703), (-2.923523234, 0.512633483), (-2.930898247, 0.556119567))
            ThreePointArc((-2.930898247, 0.556119567), (-2.991346096, 0.689104808), (-3.068060358, 0.81341868))
            add(Edge.make_bspline(
                [(-3.068060358, 0.81341868), (-3.48635792, 1.454553053), (-4.429159392, 1.454553053)],
                knots=[0.342748392, 0.342748392, 0.342748392, 1.381331695, 1.381331695, 1.381331695], degree=2, weights=[1, 0.868170926, 1]))
            Line((-4.429159392, 1.454553053), (-4.522780446, 1.454553068))
            add(Edge.make_bspline(
                [(-4.522780446, 1.454553068), (-6.108437307, 1.454553068), (-6.108437307, 0.203397992)],
                knots=[4.81203319, 4.81203319, 4.81203319, 6.344970327, 6.344970327, 6.344970327], degree=2, weights=[1, 0.720364542, 1]))
            Line((-6.108437307, 0.203397992), (-6.108437352, 0.073267738))
            add(Edge.make_bspline(
                [(-6.108437352, 0.073267738), (-6.108437352, -1.177887338), (-4.52278049, -1.177887338)],
                knots=[3.079807634, 3.079807634, 3.079807634, 4.612744771, 4.612744771, 4.612744771], degree=2, weights=[1, 0.720364542, 1]))
            Line((-4.52278049, -1.177887338), (-4.429159437, -1.177887375))
            add(Edge.make_bspline(
                [(-4.429159437, -1.177887375), (-3.486357965, -1.177887375), (-3.068060402, -0.536753002)],
                knots=[1.760260959, 1.760260959, 1.760260959, 2.798844261, 2.798844261, 2.798844261], degree=2, weights=[1, 0.868170926, 1]))
            ThreePointArc((-3.068060402, -0.536753002), (-2.994310308, -0.417650167), (-2.935646337, -0.290437354))
            ThreePointArc((-2.935646337, -0.290437354), (-2.92405335, -0.24211404), (-2.925815458, -0.192450825))
            ThreePointArc((-2.925815458, -0.192450825), (-2.937820019, -0.171527836), (-2.960480033, -0.163257123))
            Line((-2.960480033, -0.163257123), (-3.891788755, -0.163257123))
            ThreePointArc((-3.891788755, -0.163257123), (-3.929556585, -0.175257922), (-3.953470124, -0.206858093))
            add(Edge.make_bspline(
                [(-4.449961703, -0.577741646), (-4.084853792, -0.578100851), (-3.953470124, -0.206858093)],
                knots=[5.955155363, 5.955155363, 5.955155363, 7.020735545, 7.020735545, 7.020735545], degree=2, weights=[1, 0.86139323, 1]))
            add(Edge.make_bspline(
                [(-4.509754859, 0.854894524), (-5.131844593, 0.82343689), (-5.101858724, 0.104979402), (-5.071872854, -0.613478086), (-4.449961703, -0.577741646)],
                knots=[3.181025595, 3.181025595, 3.181025595, 4.754799698, 4.754799698, 6.328573801, 6.328573801, 6.328573801], degree=2, weights=[1, 0.706053195, 1, 0.706053195, 1]))
            add(Edge.make_bspline(
                [(-3.95347013, 0.487388037), (-4.099708956, 0.900606071), (-4.509754859, 0.854894524)],
                knots=[2.40404244, 2.40404244, 2.40404244, 3.565685694, 3.565685694, 3.565685694], degree=2, weights=[1, 0.836012096, 1]))
            ThreePointArc((-3.95347013, 0.487388037), (-3.92955657, 0.455787841), (-3.89178871, 0.443787032))
        make_face()
    extrude(amount=CUT_EXTRUDE3_DEPTH, mode=Mode.SUBTRACT)

    # Sketch7 → Cut-Extrude4 (cut, through all)
    with BuildSketch(Plane(origin=(0, 1.5, 0), x_dir=(1, 0, 0), z_dir=(0, 1, 0))):
        with Locations((-2.868336067, 10.6)):
            Rectangle(SKETCH7_W, SKETCH7_H)
    extrude(amount=-CUT_EXTRUDE4_DEPTH, mode=Mode.SUBTRACT)

    # Sketch8 → Cut-Extrude5 (cut, through all)
    with BuildSketch(Plane(origin=(0, 1.5, 0), x_dir=(1, 0, 0), z_dir=(0, 1, 0))):
        with Locations((-4.294025381, 2.4)):
            Rectangle(SKETCH8_W, SKETCH8_H)
    extrude(amount=-CUT_EXTRUDE5_DEPTH, mode=Mode.SUBTRACT)


solid = part.part
